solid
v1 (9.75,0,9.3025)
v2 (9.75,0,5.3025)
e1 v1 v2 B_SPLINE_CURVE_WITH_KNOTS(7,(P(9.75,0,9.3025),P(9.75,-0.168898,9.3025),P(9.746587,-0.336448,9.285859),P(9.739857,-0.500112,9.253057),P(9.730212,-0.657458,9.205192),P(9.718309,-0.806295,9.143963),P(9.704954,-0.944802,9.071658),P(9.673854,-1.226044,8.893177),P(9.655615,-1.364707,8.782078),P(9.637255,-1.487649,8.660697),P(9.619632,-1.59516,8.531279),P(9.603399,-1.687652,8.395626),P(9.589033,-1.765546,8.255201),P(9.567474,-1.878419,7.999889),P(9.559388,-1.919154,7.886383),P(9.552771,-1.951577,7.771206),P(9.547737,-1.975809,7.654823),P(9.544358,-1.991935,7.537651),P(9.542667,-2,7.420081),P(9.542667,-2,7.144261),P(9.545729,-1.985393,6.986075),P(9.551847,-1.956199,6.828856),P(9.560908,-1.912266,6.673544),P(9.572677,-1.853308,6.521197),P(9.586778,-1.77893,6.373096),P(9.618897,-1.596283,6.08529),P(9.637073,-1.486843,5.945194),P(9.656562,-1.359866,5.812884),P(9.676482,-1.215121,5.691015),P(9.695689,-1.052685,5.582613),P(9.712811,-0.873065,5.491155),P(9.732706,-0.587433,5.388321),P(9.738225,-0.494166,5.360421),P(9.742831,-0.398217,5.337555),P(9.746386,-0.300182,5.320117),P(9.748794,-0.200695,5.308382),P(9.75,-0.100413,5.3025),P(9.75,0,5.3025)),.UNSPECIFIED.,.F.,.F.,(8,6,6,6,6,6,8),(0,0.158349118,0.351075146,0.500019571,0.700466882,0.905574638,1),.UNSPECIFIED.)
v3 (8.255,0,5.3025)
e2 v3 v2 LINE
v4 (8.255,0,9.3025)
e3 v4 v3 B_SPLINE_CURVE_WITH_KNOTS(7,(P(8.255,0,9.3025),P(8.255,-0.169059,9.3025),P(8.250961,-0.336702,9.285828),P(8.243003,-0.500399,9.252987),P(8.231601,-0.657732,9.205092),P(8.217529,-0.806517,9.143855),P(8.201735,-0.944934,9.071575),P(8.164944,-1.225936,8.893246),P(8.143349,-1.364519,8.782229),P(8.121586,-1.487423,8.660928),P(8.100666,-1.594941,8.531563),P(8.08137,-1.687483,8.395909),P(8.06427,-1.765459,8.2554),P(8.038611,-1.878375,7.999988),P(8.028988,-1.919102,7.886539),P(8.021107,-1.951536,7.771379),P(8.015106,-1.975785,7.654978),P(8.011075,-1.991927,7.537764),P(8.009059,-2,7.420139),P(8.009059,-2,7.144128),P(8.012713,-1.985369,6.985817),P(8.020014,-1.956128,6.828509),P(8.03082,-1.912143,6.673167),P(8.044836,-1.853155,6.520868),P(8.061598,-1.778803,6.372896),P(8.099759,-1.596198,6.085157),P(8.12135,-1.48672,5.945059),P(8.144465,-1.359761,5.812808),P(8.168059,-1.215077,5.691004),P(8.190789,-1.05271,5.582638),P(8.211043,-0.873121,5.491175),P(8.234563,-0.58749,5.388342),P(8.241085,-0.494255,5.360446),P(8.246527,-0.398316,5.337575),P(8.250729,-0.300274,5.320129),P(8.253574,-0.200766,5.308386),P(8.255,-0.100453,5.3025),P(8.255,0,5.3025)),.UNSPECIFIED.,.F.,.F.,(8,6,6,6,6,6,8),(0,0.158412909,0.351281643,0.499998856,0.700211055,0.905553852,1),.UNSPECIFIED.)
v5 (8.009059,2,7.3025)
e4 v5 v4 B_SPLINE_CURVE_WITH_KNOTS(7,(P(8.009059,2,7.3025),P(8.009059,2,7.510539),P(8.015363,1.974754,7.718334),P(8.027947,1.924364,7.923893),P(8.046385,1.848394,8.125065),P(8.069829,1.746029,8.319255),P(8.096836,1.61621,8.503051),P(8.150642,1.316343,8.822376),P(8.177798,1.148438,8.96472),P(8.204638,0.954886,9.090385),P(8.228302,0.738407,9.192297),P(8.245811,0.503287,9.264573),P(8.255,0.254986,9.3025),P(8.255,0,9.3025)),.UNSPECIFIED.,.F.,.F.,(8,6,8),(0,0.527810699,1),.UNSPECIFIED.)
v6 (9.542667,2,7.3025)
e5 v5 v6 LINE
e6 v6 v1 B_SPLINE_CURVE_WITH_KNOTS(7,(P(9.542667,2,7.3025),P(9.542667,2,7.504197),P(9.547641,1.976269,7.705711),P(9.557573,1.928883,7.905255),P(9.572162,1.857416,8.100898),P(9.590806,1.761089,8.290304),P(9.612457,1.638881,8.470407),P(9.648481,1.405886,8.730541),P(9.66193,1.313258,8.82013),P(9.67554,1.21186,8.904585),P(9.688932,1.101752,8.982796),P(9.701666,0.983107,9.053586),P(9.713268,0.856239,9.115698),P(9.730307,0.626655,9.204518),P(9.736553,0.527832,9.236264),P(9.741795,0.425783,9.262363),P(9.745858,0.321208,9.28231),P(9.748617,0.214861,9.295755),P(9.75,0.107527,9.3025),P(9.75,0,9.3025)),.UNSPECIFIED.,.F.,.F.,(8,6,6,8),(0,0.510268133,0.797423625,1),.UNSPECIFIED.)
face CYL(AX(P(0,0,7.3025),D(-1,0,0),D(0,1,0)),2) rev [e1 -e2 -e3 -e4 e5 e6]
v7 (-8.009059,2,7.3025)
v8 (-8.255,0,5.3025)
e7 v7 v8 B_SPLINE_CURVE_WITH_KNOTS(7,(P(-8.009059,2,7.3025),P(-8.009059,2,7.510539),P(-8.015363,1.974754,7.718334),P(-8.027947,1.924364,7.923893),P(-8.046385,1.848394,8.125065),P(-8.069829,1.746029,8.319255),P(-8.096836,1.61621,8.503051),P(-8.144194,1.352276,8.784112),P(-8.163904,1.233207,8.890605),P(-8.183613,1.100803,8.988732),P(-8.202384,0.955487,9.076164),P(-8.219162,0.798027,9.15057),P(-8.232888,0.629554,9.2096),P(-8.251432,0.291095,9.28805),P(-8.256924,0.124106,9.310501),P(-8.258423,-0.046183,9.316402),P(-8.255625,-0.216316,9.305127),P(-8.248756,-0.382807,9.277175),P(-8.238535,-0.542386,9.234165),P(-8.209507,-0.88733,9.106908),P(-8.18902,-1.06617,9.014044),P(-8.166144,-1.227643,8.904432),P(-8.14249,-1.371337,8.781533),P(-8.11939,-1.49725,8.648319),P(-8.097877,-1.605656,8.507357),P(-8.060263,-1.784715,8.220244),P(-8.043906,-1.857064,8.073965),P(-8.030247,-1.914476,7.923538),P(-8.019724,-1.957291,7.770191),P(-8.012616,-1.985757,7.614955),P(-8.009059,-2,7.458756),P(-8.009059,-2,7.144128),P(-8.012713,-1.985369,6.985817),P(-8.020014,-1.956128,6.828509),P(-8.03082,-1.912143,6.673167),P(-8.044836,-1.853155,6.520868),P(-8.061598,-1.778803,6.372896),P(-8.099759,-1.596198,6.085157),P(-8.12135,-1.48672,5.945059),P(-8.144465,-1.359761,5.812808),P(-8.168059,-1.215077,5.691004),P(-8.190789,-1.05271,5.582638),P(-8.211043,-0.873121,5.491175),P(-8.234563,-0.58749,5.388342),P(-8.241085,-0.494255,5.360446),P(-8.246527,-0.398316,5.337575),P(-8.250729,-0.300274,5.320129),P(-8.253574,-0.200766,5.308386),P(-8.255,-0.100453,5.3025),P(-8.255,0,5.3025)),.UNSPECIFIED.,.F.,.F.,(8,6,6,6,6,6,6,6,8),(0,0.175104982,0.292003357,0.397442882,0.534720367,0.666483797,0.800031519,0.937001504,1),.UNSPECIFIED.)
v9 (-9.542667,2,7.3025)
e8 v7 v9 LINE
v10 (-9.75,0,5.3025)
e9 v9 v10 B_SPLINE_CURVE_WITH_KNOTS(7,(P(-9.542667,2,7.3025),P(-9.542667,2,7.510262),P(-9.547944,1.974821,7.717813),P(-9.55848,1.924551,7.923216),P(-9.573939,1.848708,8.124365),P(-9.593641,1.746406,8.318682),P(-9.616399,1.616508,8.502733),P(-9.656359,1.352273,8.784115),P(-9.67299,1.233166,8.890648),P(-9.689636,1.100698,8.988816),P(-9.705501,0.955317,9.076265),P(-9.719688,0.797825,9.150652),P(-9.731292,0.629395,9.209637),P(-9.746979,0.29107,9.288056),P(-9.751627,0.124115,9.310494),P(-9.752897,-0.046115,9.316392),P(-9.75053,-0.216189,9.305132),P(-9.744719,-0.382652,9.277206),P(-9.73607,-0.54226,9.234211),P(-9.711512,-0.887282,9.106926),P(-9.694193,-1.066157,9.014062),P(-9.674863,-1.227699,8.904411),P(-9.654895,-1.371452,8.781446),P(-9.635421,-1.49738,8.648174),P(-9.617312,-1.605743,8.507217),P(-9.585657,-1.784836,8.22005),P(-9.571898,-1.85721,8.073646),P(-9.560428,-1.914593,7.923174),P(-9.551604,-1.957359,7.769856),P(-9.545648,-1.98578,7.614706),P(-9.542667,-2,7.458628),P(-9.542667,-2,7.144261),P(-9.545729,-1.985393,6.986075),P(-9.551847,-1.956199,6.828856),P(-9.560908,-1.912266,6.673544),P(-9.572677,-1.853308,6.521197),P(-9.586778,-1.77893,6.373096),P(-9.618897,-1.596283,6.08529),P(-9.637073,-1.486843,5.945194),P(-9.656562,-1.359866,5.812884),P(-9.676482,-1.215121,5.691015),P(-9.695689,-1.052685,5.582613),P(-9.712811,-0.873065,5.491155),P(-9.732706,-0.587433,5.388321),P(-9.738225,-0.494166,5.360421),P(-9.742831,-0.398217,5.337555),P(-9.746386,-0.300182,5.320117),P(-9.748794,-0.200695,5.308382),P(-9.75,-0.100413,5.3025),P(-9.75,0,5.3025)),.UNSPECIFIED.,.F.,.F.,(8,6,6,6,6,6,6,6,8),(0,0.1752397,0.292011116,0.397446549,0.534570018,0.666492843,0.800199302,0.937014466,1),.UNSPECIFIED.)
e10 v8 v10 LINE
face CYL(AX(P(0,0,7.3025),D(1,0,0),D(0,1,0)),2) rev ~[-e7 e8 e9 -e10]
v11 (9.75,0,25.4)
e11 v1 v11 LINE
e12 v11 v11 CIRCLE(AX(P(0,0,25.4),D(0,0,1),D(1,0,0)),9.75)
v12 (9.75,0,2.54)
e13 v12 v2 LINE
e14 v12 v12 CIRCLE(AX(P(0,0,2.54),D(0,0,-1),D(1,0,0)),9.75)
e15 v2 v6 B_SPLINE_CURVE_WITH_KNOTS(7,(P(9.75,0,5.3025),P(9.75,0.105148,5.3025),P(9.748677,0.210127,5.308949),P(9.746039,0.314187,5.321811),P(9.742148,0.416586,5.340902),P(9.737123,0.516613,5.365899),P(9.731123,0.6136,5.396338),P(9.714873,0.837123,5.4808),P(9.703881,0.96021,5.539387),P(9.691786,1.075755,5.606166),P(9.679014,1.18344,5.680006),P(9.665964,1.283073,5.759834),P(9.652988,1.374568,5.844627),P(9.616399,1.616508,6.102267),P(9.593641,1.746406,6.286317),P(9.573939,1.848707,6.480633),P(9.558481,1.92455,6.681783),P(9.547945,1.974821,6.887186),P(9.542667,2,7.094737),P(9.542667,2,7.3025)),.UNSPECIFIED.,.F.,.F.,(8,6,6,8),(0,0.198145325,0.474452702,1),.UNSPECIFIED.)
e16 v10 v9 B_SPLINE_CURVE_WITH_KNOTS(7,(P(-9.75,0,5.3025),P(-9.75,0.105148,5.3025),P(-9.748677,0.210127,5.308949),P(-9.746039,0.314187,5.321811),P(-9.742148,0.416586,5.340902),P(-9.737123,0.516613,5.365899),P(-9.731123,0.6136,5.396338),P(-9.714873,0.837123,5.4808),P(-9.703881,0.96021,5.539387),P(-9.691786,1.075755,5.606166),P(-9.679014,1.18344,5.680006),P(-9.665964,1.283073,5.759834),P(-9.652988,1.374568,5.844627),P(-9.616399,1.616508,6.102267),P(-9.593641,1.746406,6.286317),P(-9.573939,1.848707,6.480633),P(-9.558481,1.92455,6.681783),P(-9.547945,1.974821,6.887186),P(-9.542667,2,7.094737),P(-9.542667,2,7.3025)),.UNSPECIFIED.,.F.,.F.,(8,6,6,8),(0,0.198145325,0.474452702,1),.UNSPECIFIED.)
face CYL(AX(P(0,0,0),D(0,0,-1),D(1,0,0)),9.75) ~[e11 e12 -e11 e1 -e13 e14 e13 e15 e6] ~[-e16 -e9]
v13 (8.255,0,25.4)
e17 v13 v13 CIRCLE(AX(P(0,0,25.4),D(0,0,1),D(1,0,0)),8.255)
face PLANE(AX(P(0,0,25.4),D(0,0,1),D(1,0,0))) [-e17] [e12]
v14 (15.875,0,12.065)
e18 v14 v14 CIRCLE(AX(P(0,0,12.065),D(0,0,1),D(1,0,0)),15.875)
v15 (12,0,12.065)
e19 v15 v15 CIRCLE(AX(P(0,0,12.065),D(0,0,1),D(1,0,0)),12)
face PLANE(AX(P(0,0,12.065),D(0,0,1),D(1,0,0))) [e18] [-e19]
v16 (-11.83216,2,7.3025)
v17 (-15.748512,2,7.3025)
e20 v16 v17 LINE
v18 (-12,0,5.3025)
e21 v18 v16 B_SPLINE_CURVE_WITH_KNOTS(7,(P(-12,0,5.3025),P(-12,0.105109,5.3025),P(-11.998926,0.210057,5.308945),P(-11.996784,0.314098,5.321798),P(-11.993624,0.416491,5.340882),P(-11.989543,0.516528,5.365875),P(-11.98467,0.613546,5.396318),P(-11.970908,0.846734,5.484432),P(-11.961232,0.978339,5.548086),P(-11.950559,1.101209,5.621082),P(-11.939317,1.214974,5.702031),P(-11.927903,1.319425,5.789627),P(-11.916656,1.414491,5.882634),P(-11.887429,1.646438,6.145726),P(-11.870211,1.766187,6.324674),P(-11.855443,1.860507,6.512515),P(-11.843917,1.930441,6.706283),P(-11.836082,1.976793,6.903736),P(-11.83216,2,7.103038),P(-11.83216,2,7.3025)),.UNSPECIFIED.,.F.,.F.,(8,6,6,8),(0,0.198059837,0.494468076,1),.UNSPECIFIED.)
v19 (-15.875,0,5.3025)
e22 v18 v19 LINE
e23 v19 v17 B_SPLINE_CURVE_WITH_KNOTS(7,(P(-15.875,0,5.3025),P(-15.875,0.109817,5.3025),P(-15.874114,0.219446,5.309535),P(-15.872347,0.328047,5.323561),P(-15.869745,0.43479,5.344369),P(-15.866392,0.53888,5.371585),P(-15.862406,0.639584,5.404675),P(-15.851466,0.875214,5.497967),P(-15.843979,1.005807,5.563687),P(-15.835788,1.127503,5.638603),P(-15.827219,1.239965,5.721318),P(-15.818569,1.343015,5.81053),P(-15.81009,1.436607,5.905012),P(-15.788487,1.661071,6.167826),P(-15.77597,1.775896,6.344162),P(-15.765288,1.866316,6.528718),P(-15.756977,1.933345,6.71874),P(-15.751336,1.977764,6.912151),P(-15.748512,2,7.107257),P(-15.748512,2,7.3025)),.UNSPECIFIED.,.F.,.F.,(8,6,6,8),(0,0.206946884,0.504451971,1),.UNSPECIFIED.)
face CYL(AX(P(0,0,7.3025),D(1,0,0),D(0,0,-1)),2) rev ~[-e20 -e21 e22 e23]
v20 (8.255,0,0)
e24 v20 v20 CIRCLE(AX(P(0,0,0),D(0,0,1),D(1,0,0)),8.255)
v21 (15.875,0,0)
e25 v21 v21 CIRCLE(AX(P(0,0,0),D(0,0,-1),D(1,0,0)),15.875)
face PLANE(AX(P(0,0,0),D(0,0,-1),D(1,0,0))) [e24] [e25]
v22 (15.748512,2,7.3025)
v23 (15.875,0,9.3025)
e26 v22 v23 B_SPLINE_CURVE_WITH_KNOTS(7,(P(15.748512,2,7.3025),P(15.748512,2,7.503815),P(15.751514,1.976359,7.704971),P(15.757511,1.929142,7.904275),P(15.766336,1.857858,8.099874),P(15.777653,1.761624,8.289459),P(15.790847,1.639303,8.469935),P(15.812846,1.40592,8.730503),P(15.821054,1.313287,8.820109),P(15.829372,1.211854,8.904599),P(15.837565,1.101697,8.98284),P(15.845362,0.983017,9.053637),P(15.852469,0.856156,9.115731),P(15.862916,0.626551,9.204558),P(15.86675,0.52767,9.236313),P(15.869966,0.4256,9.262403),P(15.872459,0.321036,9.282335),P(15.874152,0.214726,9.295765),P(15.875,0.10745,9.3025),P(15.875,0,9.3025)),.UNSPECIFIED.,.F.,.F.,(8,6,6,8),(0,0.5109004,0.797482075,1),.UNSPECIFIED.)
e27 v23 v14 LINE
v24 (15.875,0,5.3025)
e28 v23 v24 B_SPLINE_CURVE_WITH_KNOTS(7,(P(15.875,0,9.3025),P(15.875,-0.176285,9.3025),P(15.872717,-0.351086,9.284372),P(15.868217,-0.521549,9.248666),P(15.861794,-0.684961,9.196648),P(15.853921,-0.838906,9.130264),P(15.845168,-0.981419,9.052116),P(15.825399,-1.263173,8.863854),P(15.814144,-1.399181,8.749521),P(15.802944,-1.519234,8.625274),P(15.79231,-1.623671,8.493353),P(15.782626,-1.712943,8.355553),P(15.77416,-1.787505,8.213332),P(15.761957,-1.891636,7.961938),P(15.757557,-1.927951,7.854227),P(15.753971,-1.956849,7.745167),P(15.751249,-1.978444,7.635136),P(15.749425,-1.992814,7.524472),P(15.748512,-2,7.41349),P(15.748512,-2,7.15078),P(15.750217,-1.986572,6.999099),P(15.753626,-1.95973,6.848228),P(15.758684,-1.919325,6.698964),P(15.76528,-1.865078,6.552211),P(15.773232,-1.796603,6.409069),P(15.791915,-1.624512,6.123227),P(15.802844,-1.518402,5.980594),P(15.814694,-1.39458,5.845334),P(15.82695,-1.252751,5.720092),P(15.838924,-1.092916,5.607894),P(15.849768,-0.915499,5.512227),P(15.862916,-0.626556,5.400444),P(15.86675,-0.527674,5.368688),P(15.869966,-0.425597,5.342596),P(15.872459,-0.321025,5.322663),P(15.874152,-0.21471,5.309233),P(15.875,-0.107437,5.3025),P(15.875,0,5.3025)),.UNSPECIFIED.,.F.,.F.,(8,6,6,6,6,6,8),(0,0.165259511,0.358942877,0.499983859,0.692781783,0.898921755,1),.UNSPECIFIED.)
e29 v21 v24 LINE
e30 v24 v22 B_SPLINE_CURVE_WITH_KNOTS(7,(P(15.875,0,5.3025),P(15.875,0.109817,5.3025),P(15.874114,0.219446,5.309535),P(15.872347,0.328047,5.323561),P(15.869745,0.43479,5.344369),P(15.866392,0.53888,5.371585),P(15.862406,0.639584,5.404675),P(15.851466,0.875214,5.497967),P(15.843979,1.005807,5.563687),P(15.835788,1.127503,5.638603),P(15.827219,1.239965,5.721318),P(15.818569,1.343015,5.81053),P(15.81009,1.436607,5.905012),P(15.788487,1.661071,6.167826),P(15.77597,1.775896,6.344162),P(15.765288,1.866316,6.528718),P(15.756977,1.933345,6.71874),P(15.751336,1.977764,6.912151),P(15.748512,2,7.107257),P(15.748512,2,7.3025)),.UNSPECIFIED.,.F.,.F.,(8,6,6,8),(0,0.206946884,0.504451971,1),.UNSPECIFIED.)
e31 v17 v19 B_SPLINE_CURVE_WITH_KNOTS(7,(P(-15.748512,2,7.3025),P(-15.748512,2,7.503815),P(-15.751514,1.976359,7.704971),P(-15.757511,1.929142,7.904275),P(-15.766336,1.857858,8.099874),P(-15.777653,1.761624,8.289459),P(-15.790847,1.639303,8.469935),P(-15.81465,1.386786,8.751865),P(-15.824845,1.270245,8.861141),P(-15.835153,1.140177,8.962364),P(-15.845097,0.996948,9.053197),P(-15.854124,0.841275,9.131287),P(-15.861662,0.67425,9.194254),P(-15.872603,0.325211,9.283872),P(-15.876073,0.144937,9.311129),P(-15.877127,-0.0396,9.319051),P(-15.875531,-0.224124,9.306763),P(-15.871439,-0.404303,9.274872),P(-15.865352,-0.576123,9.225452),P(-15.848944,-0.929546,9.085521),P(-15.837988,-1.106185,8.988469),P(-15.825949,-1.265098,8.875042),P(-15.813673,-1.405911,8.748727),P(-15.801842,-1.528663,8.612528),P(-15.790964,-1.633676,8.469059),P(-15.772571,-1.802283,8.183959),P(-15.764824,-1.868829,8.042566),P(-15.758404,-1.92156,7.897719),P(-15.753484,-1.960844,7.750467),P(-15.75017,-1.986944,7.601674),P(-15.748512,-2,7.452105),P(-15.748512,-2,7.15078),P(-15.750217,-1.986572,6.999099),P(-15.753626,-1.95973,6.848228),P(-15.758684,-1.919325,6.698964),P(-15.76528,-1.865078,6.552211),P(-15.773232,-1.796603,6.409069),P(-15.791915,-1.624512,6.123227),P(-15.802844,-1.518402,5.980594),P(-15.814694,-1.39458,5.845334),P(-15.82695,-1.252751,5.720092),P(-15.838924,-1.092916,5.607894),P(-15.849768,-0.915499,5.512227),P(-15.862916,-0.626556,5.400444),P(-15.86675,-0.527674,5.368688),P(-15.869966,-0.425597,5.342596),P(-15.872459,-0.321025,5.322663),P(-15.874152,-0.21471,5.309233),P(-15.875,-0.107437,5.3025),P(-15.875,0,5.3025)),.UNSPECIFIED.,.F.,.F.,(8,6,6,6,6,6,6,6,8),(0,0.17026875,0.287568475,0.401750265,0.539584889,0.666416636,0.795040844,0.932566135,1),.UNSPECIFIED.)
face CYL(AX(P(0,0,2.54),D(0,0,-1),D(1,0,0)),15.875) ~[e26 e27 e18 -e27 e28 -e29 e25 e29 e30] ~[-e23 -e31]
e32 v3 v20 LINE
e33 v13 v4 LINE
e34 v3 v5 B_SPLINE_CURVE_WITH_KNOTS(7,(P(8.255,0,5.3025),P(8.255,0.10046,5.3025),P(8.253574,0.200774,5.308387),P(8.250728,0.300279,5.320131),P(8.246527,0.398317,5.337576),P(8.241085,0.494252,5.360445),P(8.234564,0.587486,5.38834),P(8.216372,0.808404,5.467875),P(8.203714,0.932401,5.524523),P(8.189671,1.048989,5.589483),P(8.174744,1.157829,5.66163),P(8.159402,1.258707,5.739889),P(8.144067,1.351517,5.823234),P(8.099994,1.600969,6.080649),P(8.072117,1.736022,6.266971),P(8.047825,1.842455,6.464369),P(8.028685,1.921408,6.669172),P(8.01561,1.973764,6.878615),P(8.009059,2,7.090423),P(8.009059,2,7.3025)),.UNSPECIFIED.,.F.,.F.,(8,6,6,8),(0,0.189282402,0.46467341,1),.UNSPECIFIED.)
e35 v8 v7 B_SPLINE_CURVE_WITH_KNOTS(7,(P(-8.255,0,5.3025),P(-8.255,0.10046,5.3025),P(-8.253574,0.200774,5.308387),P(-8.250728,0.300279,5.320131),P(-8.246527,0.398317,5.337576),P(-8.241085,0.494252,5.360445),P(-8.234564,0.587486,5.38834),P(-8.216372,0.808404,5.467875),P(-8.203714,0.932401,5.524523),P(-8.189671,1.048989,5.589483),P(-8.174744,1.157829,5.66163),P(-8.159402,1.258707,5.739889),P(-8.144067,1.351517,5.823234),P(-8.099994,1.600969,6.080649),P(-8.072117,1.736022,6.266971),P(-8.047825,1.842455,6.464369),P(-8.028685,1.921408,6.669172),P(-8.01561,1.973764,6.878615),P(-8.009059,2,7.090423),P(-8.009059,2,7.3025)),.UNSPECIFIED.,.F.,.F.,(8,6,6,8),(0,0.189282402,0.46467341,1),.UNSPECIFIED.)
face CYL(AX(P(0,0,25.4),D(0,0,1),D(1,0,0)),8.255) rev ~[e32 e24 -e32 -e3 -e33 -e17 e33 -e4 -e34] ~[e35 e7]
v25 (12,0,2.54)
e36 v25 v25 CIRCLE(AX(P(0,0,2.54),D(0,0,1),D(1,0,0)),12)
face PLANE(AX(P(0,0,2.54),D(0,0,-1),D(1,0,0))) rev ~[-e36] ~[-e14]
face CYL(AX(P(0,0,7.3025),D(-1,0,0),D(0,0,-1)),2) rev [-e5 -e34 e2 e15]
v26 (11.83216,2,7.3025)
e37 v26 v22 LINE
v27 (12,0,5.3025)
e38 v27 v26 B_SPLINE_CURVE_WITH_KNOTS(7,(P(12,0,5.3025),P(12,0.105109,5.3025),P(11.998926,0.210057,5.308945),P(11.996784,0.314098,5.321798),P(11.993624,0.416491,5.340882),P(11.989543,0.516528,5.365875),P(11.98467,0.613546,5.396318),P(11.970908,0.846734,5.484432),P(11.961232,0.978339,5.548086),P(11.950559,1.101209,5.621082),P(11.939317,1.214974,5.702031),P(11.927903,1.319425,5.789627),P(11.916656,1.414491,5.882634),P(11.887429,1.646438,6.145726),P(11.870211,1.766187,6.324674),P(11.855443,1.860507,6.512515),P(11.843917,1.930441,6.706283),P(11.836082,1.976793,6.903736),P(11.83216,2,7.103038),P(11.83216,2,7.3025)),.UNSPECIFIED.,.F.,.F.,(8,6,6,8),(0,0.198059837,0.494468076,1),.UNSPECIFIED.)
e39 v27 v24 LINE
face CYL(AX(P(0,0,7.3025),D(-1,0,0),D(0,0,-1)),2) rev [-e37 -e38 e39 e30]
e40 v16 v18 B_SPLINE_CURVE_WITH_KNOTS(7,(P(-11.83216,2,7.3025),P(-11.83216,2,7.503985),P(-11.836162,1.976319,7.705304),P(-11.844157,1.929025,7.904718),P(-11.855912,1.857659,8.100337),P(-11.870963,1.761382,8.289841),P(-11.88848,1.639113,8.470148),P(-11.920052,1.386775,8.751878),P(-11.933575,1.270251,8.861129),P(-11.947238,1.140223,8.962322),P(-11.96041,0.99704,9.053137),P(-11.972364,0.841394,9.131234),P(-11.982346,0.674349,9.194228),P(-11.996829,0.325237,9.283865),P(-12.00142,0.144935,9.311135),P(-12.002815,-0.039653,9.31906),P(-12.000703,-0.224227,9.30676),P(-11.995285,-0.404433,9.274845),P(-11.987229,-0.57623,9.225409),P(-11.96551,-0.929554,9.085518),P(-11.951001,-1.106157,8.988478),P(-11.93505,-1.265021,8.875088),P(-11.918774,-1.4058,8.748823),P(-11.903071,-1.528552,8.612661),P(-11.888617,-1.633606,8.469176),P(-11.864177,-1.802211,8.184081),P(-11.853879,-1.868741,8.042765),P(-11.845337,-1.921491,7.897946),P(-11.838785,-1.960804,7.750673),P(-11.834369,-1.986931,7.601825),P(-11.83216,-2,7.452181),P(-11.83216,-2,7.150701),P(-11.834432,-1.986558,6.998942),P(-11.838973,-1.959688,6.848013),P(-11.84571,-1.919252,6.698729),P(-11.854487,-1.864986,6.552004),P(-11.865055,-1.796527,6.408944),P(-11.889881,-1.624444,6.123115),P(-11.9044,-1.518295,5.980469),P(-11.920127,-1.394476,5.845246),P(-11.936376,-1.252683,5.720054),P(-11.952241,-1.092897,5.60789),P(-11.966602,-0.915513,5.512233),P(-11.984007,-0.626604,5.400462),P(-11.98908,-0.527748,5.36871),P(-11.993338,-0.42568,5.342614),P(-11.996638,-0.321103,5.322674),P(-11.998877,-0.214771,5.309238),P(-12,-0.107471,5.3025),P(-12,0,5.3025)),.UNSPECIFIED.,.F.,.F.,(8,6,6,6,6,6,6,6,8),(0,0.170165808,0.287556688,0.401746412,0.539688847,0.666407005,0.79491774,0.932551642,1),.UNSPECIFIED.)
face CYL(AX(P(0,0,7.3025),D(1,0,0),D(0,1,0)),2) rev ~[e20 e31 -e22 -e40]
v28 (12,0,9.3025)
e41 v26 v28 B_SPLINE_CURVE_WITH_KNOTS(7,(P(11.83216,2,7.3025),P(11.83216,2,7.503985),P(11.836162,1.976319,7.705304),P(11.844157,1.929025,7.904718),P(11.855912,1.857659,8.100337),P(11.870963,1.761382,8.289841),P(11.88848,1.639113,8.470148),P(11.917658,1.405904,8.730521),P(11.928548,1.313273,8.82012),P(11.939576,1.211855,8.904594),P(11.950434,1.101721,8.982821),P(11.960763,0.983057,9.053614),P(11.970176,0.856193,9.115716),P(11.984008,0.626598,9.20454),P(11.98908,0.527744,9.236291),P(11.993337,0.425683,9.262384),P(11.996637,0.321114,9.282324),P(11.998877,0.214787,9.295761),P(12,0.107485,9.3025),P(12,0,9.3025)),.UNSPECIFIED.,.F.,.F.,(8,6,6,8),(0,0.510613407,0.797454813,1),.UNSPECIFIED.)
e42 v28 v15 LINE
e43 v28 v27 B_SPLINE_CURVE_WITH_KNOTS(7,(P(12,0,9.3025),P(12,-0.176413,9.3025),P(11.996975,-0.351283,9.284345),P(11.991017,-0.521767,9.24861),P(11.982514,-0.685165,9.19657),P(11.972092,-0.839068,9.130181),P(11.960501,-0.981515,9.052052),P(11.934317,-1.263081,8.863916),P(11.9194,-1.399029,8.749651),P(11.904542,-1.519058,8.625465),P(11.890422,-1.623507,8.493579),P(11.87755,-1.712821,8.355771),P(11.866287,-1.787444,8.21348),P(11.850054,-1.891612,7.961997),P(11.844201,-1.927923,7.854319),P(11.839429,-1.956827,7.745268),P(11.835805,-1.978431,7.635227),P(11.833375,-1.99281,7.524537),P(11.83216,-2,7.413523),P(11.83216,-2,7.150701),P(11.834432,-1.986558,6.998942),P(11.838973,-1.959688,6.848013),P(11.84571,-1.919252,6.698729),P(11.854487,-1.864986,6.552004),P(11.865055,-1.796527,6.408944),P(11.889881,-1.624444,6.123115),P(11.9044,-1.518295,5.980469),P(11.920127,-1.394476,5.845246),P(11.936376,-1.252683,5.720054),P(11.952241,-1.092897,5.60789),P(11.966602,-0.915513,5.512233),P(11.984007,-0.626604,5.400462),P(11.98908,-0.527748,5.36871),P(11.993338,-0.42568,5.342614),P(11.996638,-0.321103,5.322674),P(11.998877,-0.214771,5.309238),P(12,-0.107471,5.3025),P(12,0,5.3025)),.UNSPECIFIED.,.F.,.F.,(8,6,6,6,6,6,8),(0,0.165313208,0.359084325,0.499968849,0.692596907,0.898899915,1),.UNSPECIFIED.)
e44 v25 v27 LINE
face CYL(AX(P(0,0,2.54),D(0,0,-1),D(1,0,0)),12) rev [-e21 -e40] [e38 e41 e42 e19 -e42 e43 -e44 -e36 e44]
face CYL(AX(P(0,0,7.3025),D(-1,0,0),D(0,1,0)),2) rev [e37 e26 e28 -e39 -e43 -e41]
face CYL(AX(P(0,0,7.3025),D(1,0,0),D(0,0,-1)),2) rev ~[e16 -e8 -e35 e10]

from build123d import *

# Parameters (mm, degrees)
F0_R          = 9.75
F1_DEPTH      = 25.4
F2_R          = 8.255
F3_DEPTH      = 25.4
F4_R          = 15.875
F4_R_2        = 9.75
F5_DEPTH      = 2.54
F6_R          = 15.875
F6_R_2        = 12
F7_DEPTH      = 9.525
F9_DEPTH      = 25.4
F9_DEPTH_BACK = 25.4


with BuildPart() as f1:
    # F0 (on Top) → F1 (new body)
    with BuildSketch(Plane.XY):
        Circle(F0_R)
    extrude(amount=F1_DEPTH)

    # F2 (on face) → F3 (cut)
    with BuildSketch(Plane.XY.offset(25.4)):
        Circle(F2_R)
    extrude(amount=-F3_DEPTH, mode=Mode.SUBTRACT)

    # F4 (on face) → F5 (join)
    with BuildSketch(Plane(origin=(0, 0, 0), x_dir=(1, 0, 0), z_dir=(0, 0, -1))):
        Circle(F4_R)
        Circle(F4_R_2, mode=Mode.SUBTRACT)
    extrude(amount=-F5_DEPTH)

    # F6 (on face) → F7 (join)
    with BuildSketch(Plane.XY.offset(2.54)):
        Circle(F6_R)
        Circle(F6_R_2, mode=Mode.SUBTRACT)
    extrude(amount=F7_DEPTH)

    # F8 (on Right) → F9 (cut, two sides)
    with BuildSketch(Plane.YZ) as f9_sk:
        with BuildLine():
            ThreePointArc((0, 5.3025), (1.4142135624, 5.8882864376), (2, 7.3025))
            ThreePointArc((2, 7.3025), (-1.4142135624, 8.7167135624), (0, 5.3025))
        make_face()
    extrude(amount=-F9_DEPTH, mode=Mode.SUBTRACT)
    extrude(f9_sk.sketch, amount=F9_DEPTH_BACK, mode=Mode.SUBTRACT)


solid = f1.part
